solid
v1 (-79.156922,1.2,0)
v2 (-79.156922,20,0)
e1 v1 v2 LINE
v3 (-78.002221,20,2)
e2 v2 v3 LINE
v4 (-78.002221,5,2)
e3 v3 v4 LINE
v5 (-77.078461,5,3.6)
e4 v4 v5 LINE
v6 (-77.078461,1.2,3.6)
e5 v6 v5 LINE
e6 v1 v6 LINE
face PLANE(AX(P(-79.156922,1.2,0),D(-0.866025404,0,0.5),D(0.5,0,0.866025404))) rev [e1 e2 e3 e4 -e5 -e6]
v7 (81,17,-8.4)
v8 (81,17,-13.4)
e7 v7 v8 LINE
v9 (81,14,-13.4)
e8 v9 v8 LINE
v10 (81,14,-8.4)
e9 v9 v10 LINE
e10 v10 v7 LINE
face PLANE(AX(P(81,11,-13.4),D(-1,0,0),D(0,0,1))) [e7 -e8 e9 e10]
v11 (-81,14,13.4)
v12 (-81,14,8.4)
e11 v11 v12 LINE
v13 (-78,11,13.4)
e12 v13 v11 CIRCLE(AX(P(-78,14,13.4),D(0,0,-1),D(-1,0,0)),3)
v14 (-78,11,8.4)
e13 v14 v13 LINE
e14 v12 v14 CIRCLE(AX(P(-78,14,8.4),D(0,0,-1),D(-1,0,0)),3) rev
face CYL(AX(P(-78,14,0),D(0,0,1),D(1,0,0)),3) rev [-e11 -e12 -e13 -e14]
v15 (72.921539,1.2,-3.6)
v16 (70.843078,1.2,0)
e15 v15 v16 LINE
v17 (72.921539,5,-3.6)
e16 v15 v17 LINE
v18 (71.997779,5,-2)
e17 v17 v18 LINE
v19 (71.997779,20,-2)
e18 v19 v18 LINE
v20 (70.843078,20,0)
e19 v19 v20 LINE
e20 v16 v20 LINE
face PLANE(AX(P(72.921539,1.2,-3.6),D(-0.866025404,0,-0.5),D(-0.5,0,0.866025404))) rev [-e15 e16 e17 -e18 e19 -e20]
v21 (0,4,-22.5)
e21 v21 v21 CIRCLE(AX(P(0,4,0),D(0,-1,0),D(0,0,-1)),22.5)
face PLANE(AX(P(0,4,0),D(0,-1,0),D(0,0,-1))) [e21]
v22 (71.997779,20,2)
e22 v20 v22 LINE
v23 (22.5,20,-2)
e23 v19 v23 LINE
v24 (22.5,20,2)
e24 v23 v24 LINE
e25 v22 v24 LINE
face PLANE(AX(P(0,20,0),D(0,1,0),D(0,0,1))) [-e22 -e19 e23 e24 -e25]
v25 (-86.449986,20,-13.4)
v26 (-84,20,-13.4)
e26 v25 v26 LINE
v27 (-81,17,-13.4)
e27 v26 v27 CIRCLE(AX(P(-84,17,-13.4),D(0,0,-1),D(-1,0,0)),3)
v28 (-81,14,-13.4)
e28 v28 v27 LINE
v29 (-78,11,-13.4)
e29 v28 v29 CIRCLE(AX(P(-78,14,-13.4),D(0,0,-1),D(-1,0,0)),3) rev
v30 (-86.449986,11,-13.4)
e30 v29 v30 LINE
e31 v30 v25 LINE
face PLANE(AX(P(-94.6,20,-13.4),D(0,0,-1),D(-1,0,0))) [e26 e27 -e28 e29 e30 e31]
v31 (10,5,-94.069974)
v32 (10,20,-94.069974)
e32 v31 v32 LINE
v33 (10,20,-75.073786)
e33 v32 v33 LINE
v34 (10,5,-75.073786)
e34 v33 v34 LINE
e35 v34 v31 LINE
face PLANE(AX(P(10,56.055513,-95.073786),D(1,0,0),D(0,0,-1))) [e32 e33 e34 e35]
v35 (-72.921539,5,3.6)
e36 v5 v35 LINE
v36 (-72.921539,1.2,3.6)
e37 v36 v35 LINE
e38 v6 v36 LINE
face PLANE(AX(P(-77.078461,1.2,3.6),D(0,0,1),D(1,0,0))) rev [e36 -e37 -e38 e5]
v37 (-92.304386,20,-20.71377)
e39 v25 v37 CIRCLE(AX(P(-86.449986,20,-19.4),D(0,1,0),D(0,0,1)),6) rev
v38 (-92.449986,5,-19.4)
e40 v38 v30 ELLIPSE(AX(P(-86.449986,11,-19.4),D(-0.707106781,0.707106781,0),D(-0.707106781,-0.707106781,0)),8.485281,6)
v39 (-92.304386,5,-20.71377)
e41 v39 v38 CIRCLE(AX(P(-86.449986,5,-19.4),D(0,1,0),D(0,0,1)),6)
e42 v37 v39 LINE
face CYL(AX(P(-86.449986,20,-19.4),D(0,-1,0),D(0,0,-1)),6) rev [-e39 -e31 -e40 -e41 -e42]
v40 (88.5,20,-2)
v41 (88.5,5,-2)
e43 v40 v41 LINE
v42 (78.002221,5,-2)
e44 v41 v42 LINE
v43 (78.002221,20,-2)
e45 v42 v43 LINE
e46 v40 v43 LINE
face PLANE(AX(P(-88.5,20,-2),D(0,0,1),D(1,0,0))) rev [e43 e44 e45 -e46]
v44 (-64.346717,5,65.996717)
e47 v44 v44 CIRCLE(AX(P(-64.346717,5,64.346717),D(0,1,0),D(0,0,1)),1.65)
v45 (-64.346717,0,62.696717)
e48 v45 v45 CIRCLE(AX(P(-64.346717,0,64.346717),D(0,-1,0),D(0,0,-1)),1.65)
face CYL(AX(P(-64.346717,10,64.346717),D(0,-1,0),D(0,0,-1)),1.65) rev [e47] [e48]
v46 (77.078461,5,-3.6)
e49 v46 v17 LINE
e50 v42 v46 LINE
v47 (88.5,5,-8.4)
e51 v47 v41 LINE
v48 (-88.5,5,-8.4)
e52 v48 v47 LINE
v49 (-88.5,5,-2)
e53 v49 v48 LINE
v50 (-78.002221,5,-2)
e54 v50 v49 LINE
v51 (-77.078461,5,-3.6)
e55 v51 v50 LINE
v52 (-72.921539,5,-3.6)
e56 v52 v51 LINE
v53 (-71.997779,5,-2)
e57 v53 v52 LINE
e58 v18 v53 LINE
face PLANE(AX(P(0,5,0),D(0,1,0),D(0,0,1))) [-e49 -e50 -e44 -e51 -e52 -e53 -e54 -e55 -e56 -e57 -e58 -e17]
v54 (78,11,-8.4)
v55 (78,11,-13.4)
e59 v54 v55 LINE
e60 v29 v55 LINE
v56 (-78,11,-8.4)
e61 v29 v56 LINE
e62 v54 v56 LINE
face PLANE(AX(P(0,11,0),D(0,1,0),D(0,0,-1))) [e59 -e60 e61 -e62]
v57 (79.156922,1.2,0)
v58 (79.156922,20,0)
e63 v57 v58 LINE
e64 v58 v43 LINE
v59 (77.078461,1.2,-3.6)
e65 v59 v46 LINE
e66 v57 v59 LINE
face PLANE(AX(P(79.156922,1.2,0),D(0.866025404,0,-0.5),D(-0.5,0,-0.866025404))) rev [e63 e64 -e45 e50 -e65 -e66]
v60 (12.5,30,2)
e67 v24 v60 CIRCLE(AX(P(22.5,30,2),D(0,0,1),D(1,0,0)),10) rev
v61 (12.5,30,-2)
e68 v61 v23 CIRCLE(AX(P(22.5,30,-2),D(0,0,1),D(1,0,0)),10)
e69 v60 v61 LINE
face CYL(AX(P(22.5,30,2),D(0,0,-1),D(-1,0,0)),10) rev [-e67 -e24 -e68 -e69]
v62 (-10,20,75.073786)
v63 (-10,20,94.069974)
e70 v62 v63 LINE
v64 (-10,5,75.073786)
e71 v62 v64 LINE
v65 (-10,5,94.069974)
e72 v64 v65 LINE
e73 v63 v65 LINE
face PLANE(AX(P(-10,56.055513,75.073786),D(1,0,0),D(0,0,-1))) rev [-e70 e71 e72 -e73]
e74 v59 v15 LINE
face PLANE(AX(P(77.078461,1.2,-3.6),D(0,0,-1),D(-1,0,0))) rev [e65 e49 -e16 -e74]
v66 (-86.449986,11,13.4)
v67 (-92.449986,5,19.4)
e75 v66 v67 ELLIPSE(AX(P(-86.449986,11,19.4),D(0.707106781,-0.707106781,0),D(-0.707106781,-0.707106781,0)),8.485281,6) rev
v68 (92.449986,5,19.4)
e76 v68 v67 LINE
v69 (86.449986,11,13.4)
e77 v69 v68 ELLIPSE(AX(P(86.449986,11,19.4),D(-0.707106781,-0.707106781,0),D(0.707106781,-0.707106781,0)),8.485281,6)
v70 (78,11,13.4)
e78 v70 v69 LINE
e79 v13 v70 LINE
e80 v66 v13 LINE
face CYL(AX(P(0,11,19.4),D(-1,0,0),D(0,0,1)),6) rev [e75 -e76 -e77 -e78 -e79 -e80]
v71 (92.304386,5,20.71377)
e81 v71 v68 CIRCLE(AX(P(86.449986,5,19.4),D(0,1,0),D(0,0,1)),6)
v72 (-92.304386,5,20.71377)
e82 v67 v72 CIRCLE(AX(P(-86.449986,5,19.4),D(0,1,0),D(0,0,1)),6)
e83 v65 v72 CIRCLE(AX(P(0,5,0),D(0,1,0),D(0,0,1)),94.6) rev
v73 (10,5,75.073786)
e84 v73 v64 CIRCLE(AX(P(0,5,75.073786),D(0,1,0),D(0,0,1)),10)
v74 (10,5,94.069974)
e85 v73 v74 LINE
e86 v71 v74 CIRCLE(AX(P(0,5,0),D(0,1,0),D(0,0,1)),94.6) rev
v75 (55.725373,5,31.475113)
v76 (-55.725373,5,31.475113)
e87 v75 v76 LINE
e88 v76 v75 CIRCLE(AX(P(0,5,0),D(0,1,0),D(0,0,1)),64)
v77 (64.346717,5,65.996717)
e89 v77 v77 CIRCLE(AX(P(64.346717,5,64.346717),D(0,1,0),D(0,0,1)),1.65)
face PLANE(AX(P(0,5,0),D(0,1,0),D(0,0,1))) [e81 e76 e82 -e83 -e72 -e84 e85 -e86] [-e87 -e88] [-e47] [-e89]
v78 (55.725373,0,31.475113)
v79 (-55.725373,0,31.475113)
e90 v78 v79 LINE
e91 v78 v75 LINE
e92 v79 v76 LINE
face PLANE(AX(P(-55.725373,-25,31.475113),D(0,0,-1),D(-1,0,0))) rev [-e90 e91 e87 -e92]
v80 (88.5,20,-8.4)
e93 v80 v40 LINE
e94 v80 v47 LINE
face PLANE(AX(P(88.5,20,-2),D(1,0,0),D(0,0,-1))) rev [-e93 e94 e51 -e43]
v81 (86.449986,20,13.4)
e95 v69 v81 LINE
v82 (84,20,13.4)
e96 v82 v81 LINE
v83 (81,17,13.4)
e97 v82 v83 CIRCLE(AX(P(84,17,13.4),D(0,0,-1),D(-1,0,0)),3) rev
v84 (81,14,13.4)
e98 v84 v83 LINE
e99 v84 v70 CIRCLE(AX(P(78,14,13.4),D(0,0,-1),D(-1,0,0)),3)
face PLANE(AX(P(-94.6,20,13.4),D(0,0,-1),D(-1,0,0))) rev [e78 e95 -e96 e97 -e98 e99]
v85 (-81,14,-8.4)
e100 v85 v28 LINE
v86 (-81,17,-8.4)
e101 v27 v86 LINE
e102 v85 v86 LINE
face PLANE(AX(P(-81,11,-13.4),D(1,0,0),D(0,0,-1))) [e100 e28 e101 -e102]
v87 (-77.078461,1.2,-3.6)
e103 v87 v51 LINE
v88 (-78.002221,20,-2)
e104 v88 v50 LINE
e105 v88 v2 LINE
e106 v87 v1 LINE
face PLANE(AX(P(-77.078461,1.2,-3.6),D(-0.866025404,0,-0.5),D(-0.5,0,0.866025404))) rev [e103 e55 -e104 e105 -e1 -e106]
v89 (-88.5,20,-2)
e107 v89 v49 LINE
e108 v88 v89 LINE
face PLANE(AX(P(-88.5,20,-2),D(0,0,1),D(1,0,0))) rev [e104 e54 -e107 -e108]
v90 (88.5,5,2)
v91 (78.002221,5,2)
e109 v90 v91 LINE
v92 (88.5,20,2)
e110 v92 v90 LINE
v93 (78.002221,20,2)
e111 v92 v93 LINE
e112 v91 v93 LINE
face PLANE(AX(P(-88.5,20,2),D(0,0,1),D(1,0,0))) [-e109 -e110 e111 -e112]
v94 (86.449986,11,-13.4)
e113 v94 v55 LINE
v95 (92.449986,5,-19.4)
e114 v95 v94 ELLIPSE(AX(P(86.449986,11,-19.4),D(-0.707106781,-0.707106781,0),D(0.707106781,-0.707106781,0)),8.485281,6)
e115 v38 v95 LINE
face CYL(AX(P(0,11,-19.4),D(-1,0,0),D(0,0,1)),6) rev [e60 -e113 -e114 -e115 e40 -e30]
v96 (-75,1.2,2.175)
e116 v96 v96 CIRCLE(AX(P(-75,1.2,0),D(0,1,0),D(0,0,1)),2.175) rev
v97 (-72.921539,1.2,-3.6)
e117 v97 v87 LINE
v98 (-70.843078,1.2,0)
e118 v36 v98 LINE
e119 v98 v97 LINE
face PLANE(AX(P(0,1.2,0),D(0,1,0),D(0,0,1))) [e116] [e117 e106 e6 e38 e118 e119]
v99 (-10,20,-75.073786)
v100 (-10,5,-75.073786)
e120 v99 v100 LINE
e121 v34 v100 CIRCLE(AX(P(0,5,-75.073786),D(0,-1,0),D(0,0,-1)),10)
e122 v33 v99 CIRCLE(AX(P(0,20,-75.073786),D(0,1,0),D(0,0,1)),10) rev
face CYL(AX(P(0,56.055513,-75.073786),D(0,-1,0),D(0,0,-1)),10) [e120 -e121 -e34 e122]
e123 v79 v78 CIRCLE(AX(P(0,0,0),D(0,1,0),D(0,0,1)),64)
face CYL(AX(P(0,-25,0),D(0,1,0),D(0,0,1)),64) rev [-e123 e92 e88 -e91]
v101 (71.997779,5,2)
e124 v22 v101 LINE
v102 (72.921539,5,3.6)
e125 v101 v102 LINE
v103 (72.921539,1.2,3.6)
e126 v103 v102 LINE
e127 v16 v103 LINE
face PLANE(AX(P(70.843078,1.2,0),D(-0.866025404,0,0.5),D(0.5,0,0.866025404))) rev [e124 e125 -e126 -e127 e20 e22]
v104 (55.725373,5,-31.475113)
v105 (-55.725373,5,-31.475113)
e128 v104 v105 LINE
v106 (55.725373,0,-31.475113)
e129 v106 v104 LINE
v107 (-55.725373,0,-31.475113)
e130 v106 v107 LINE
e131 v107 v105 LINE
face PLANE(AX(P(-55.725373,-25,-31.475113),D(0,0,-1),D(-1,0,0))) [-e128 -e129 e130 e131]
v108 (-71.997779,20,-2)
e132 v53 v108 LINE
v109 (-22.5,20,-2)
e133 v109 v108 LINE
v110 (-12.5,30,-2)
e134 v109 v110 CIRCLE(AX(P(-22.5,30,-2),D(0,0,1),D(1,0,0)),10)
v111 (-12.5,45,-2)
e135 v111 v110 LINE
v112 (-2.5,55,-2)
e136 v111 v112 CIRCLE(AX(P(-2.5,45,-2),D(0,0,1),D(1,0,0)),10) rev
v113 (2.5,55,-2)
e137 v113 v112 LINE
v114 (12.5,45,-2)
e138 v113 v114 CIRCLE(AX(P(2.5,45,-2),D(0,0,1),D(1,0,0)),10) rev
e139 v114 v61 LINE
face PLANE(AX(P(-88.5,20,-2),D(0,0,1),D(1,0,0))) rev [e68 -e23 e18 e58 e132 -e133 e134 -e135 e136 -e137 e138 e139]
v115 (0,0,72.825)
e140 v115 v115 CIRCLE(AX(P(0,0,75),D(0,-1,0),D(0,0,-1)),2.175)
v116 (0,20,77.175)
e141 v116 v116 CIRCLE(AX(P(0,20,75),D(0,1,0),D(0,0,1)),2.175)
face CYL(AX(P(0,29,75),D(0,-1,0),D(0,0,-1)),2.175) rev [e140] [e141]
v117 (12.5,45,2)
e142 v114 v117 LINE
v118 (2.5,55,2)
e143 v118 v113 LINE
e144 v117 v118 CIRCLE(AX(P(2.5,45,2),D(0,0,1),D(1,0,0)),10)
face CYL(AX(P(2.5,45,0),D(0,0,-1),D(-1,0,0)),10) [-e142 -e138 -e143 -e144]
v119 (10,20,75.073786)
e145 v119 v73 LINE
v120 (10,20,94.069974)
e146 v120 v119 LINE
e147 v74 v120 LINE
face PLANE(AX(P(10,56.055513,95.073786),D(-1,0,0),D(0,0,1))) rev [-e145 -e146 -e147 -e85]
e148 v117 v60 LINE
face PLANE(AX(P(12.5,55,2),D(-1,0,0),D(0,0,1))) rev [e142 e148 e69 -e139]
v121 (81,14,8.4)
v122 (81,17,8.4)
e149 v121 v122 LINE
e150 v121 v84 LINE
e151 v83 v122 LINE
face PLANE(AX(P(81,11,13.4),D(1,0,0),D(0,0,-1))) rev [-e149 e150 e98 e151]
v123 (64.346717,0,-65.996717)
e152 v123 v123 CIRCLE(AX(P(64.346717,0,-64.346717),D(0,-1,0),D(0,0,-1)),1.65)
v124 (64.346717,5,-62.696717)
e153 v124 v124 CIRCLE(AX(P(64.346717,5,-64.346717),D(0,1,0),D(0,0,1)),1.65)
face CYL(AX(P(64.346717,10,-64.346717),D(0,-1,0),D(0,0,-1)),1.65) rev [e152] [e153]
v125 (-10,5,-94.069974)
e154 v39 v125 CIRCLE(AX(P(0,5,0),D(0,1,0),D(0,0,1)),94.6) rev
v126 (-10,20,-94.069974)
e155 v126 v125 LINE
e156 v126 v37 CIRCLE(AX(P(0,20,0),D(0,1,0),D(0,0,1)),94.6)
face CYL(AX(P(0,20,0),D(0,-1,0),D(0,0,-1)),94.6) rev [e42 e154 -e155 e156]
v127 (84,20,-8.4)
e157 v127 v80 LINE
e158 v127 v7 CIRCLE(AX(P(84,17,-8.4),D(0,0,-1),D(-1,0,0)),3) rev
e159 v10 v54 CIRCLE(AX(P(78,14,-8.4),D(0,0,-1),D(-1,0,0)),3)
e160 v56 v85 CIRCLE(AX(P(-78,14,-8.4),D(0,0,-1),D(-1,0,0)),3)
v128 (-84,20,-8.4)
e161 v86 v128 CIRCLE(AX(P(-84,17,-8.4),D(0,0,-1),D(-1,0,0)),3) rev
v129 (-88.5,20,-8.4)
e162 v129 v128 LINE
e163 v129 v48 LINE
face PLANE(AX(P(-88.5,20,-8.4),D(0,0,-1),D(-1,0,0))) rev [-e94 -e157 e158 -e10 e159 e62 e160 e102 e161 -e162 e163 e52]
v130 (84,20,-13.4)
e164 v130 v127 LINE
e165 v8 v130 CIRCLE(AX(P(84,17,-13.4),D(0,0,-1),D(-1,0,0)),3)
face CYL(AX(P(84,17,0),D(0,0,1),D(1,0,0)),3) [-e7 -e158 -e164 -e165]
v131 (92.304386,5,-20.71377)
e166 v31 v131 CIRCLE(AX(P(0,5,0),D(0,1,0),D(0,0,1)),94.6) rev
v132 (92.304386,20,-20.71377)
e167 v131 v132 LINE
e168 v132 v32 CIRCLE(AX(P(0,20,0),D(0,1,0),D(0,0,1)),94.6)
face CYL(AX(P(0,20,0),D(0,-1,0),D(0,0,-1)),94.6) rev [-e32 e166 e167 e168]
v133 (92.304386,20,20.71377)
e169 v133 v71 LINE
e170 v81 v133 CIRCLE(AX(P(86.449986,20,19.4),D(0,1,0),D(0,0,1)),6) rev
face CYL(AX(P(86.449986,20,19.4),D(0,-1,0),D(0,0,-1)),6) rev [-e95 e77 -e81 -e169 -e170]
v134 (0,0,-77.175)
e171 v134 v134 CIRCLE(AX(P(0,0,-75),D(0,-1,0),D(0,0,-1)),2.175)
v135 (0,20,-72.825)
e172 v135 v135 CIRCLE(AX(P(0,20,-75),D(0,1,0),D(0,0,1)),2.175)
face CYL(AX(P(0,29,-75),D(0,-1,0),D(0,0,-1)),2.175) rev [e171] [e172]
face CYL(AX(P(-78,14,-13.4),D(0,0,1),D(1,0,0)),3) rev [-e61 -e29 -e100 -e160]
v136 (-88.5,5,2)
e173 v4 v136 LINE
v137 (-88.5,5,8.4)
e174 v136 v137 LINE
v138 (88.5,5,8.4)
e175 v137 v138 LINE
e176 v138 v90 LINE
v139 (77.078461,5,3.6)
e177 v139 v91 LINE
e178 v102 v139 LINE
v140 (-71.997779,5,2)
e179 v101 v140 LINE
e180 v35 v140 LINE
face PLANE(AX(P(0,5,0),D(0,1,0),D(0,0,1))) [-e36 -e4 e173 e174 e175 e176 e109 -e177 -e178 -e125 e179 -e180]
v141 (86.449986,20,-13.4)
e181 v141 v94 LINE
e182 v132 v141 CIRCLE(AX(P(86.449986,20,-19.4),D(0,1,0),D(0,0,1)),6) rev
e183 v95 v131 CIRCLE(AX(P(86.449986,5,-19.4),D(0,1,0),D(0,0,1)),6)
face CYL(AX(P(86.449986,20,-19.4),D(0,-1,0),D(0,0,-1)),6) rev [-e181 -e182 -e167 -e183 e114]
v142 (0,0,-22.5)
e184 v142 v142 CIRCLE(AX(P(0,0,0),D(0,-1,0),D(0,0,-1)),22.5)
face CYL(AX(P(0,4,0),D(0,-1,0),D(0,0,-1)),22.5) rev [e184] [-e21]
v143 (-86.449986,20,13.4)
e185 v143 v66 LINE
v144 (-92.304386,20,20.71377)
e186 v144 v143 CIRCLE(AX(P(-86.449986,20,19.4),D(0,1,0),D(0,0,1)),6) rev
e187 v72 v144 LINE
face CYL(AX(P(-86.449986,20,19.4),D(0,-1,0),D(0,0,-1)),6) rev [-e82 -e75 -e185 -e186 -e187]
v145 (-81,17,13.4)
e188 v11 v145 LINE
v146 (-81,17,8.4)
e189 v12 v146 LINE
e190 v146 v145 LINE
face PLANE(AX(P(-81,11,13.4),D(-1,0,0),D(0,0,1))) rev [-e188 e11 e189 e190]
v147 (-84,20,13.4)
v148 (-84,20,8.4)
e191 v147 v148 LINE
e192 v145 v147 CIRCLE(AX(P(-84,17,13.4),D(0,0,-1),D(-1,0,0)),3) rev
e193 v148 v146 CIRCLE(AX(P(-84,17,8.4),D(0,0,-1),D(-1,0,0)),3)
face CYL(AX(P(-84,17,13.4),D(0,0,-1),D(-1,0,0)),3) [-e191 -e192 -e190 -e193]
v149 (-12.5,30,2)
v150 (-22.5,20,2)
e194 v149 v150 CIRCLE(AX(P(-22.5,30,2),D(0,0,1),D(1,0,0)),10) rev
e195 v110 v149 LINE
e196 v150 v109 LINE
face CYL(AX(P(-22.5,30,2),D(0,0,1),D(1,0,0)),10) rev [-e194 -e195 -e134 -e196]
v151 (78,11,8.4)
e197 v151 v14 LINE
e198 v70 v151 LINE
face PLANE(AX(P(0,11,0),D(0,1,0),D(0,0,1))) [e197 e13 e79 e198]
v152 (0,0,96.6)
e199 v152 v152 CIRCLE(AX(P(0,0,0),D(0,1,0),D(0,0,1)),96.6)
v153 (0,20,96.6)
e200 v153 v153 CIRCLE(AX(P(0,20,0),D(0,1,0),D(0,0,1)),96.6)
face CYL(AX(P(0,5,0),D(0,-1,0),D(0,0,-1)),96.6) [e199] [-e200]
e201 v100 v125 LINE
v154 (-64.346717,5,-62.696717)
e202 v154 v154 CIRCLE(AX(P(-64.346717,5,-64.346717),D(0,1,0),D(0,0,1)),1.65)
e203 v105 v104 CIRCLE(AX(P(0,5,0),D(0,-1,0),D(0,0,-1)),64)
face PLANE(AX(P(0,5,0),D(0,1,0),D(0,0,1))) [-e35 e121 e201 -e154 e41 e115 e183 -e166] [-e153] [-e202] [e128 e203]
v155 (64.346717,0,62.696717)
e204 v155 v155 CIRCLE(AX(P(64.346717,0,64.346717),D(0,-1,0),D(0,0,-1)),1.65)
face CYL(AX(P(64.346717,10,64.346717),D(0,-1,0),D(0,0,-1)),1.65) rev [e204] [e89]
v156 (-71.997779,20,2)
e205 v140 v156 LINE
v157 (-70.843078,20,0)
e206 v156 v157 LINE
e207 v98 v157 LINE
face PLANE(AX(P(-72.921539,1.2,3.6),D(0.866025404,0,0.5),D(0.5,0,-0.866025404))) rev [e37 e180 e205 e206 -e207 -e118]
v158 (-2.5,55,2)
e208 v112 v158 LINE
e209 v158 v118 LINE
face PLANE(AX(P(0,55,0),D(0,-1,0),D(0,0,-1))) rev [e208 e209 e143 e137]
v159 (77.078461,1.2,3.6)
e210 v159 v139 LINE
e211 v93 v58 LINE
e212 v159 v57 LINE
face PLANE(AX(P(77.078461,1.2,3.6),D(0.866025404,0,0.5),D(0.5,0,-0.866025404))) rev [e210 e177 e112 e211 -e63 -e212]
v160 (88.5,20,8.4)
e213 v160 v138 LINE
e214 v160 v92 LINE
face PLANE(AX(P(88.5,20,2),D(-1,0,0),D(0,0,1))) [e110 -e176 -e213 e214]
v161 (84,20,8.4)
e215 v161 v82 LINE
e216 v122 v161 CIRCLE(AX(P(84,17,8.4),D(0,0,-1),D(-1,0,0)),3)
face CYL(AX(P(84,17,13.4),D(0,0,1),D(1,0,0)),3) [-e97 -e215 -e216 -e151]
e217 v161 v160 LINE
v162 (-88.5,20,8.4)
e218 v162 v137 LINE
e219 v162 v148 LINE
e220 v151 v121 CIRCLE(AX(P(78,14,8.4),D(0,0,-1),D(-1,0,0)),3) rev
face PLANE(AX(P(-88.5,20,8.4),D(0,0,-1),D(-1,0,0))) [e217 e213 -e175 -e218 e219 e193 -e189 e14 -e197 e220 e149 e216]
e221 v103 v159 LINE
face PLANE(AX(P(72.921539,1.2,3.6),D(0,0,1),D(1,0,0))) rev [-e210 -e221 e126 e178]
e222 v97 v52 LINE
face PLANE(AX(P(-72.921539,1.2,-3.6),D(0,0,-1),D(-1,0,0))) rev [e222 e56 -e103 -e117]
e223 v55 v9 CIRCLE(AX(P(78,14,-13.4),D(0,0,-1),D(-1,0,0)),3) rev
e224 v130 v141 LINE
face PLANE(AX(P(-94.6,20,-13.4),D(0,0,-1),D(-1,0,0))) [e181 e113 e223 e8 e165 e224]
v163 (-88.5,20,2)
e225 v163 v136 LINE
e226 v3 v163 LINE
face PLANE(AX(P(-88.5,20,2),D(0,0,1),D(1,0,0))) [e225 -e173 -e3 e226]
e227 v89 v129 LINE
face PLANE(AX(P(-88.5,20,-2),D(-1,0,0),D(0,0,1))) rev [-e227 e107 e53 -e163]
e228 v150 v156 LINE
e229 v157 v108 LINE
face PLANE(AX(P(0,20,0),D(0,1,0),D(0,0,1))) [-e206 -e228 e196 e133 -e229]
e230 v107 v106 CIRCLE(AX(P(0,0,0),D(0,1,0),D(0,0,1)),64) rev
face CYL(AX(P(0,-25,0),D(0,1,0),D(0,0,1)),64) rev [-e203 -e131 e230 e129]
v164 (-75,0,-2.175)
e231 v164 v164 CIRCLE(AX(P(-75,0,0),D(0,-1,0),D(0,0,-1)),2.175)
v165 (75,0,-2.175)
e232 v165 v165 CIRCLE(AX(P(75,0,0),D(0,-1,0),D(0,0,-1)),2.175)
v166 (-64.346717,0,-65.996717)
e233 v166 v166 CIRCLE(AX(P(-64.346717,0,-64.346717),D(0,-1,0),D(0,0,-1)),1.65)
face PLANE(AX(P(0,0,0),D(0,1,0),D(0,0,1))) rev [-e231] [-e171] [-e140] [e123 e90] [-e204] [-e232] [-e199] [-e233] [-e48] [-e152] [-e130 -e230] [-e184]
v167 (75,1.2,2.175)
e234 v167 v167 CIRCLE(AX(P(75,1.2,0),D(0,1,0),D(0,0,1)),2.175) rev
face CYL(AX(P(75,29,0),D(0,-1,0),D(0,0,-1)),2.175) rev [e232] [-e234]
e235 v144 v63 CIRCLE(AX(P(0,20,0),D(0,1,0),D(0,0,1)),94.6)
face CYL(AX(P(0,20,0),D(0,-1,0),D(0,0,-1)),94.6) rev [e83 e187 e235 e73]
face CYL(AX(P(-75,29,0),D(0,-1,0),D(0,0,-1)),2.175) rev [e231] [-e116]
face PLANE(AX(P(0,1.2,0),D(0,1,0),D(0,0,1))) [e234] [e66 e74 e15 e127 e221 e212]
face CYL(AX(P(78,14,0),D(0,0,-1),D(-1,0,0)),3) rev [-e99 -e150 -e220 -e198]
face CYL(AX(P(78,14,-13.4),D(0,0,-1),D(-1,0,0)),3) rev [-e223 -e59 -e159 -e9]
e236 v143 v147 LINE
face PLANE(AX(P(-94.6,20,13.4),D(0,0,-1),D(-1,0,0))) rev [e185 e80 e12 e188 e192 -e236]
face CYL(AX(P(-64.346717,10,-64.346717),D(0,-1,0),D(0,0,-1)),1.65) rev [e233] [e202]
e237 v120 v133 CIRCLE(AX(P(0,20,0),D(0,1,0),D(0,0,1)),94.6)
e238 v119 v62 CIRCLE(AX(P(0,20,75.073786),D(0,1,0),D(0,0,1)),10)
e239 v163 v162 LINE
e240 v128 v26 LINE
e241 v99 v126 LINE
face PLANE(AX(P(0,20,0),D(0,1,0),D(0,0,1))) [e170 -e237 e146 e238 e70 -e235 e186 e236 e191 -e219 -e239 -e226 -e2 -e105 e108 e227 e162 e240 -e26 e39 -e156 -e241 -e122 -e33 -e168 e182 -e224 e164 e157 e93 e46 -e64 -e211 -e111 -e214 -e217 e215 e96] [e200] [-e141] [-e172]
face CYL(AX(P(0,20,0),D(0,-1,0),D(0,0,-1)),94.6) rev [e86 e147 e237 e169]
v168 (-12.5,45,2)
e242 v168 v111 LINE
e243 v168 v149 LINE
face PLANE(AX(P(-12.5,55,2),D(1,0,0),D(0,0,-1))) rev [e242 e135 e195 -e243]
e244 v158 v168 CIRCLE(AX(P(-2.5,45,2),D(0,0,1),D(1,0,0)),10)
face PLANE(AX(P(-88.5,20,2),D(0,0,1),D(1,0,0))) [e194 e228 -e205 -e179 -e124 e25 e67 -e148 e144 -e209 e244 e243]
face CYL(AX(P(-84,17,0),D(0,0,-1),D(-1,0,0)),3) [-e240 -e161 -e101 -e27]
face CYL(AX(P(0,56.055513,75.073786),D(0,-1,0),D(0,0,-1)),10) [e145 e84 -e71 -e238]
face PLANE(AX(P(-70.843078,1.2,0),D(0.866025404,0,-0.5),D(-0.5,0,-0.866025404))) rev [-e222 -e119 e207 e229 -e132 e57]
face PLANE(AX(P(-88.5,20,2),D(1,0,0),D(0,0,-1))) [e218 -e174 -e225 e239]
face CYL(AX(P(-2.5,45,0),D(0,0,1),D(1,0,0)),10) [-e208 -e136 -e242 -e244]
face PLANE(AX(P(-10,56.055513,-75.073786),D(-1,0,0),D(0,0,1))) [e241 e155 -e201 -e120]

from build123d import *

# Parameters (mm, degrees)
SKETCH1_R           = 96.6
BOSS_EXTRUDE1_DEPTH = 5
SKETCH4_R           = 96.6
SKETCH4_R_2         = 94.6
BOSS_EXTRUDE3_DEPTH = 15
SKETCH5_W           = 189.2
SKETCH5_H           = 13.4
SKETCH5_W_2         = 177
SKETCH5_H_2         = 6.4
BOSS_EXTRUDE4_DEPTH = 15
SKETCH6_R           = 22.5
CUT_EXTRUDE1_DEPTH  = 4
CUT_EXTRUDE2_DEPTH  = 9
BOSS_EXTRUDE6_DEPTH = 15
SKETCH8_R           = 2.175
CUT_EXTRUDE4_DEPTH  = 29
CUT_EXTRUDE9_DEPTH  = 30
FILLET3_R           = 3
SKETCH20_R          = 1.65
CUT_EXTRUDE10_DEPTH = 10
SKETCH24_W          = 25
SKETCH24_H          = 4
BOSS_EXTRUDE8_DEPTH = 35
FILLET2_R           = 10
CUT_EXTRUDE11_DEPTH = 18.8
FILLET4_R           = 6


with BuildPart() as part:
    # Sketch1 → Boss-Extrude1 (new body)
    with BuildSketch(Plane(origin=(0, 0, 0), x_dir=(1, 0, 0), z_dir=(0, 1, 0))):
        with Locations(Location((0, 0, 0), (0, 0, 270))):
            Circle(SKETCH1_R)
    extrude(amount=BOSS_EXTRUDE1_DEPTH)

    # Sketch4 → Boss-Extrude3 (add)
    with BuildSketch(Plane(origin=(0, 5, 0), x_dir=(1, 0, 0), z_dir=(0, 1, 0))):
        with Locations(Location((0, 0, 0), (0, 0, 270))):
            Circle(SKETCH4_R)
        with Locations(Location((0, 0, 0), (0, 0, 270))):
            Circle(SKETCH4_R_2, mode=Mode.SUBTRACT)
    extrude(amount=BOSS_EXTRUDE3_DEPTH)

    # Sketch5 → Boss-Extrude4 (add)
    with BuildSketch(Plane(origin=(0, 5, 0), x_dir=(1, 0, 0), z_dir=(0, 1, 0))):
        with Locations((0, -6.7)):
            Rectangle(SKETCH5_W, SKETCH5_H)
        with Locations((0, -5.2)):
            Rectangle(SKETCH5_W_2, SKETCH5_H_2, mode=Mode.SUBTRACT)
    boss_extrude4 = extrude(amount=BOSS_EXTRUDE4_DEPTH)

    # Mirror1: Boss-Extrude4 across plane
    add(boss_extrude4.mirror(Plane.XY))

    # Sketch6 → Cut-Extrude1 (cut)
    with BuildSketch(Plane.XZ):
        with Locations(Location((0, 0, 0), (0, 0, 270))):
            Circle(SKETCH6_R)
    extrude(amount=-CUT_EXTRUDE1_DEPTH, mode=Mode.SUBTRACT)

    # Sketch7 → Cut-Extrude2 (cut)
    with BuildSketch(Plane(origin=(0, 20, 0), x_dir=(1, 0, 0), z_dir=(0, 1, 0))):
        Polygon((0, -13.4), (-81, -13.4), (-81, -8.4), (0, -8.4), (81, -8.4), (81, -13.4), align=None)
    cut_extrude2 = extrude(amount=-CUT_EXTRUDE2_DEPTH, mode=Mode.SUBTRACT)

    # Mirror2: Cut-Extrude2 across plane
    add(cut_extrude2.mirror(Plane.XY), mode=Mode.SUBTRACT)

    # Sketch10 → Boss-Extrude6 (add)
    with BuildSketch(Plane(origin=(0, 5, 0), x_dir=(1, 0, 0), z_dir=(0, 1, 0))):
        with BuildLine():
            Line((-10, -75.073785704), (-10, -95.073785704))
            Line((-10, -95.073785704), (10, -95.073785704))
            Line((10, -95.073785704), (10, -75.073785704))
            ThreePointArc((10, -75.073785704), (0, -65.073785704), (-10, -75.073785704))
        make_face()
    boss_extrude6 = extrude(amount=BOSS_EXTRUDE6_DEPTH)

    # Mirror3: Boss-Extrude6 across plane
    add(boss_extrude6.mirror(Plane.XY))

    # Sketch8 → Cut-Extrude4 (cut)
    with BuildSketch(Plane.XZ):
        with Locations(Location((-75, 0, 0), (0, 0, 270))):
            Circle(SKETCH8_R)
        with Locations(Location((0, 75, 0), (0, 0, 270))):
            Circle(SKETCH8_R)
        with Locations(Location((75, 0, 0), (0, 0, 270))):
            Circle(SKETCH8_R)
        with Locations(Location((0, -75, 0), (0, 0, 270))):
            Circle(SKETCH8_R)
    extrude(amount=-CUT_EXTRUDE4_DEPTH, mode=Mode.SUBTRACT)

    # Sketch19 → Cut-Extrude9 (cut)
    with BuildSketch(Plane(origin=(0, 5, 0), x_dir=(1, 0, 0), z_dir=(0, 1, 0))):
        with BuildLine():
            Line((-55.725373322, -31.475113472), (55.725373322, -31.475113472))
            ThreePointArc((55.725373322, -31.475113472), (0, -64), (-55.725373322, -31.475113472))
        make_face()
    cut_extrude9 = extrude(amount=-CUT_EXTRUDE9_DEPTH, mode=Mode.SUBTRACT)

    # Mirror4: Cut-Extrude9 across plane
    add(cut_extrude9.mirror(Plane.XY), mode=Mode.SUBTRACT)

    # Fillet3
    fillet3_edges = [part.edges().sort_by_distance(p)[0] for p in [
        (81, 20, -10.9),
        (-81, 20, -10.9),
        (81, 11, -10.9),
        (-81, 11, -10.9),
        (-81, 11, 10.9),
        (81, 11, 10.9),
        (81, 20, 10.9),
        (-81, 20, 10.9),
    ]]
    fillet(fillet3_edges, radius=FILLET3_R)

    # Sketch20 → Cut-Extrude10 (cut)
    with BuildSketch(Plane.XZ):
        with Locations(Location((-64.346717088, 64.346717088, 0), (0, 0, 270))):
            Circle(SKETCH20_R)
        with Locations(Location((64.346717088, 64.346717088, 0), (0, 0, 270))):
            Circle(SKETCH20_R)
        with Locations(Location((64.346717088, -64.346717088, 0), (0, 0, 270))):
            Circle(SKETCH20_R)
        with Locations(Location((-64.346717088, -64.346717088, 0), (0, 0, 270))):
            Circle(SKETCH20_R)
    extrude(amount=-CUT_EXTRUDE10_DEPTH, mode=Mode.SUBTRACT)

    # Sketch24 → Boss-Extrude8 (add)
    with BuildSketch(Plane(origin=(0, 20, 0), x_dir=(1, 0, 0), z_dir=(0, 1, 0))):
        Rectangle(SKETCH24_W, SKETCH24_H)
    extrude(amount=BOSS_EXTRUDE8_DEPTH)

    # Fillet2
    fillet2_edges = [part.edges().sort_by_distance(p)[0] for p in [
        (12.5, 20, 0),
        (-12.5, 20, 0),
        (12.5, 55, 0),
        (-12.5, 55, 0),
    ]]
    fillet(fillet2_edges, radius=FILLET2_R)

    # Sketch25 → Cut-Extrude11 (cut)
    with BuildSketch(Plane(origin=(0, 20, 0), x_dir=(1, 0, 0), z_dir=(0, 1, 0))):
        Polygon((70.843078062, 0), (72.921539031, -3.6), (77.078460969, -3.6), (79.156921938, 0), (77.078460969, 3.6), (72.921539031, 3.6), align=None)
        Polygon((-70.843078062, 0), (-72.921539031, 3.6), (-77.078460969, 3.6), (-79.156921938, 0), (-77.078460969, -3.6), (-72.921539031, -3.6), align=None)
    extrude(amount=-CUT_EXTRUDE11_DEPTH, mode=Mode.SUBTRACT)

    # Fillet4
    fillet4_edges = [part.edges().sort_by_distance(p)[0] for p in [
        (0, 5, 13.4),
        (93.646142473, 12.5, 13.4),
        (-93.646142473, 12.5, 13.4),
        (93.646142473, 12.5, -13.4),
        (-93.646142473, 12.5, -13.4),
        (0, 5, -13.4),
    ]]
    fillet(fillet4_edges, radius=FILLET4_R - 0.0001)  # a hair under: the kernel refuses the full size


solid = part.part
